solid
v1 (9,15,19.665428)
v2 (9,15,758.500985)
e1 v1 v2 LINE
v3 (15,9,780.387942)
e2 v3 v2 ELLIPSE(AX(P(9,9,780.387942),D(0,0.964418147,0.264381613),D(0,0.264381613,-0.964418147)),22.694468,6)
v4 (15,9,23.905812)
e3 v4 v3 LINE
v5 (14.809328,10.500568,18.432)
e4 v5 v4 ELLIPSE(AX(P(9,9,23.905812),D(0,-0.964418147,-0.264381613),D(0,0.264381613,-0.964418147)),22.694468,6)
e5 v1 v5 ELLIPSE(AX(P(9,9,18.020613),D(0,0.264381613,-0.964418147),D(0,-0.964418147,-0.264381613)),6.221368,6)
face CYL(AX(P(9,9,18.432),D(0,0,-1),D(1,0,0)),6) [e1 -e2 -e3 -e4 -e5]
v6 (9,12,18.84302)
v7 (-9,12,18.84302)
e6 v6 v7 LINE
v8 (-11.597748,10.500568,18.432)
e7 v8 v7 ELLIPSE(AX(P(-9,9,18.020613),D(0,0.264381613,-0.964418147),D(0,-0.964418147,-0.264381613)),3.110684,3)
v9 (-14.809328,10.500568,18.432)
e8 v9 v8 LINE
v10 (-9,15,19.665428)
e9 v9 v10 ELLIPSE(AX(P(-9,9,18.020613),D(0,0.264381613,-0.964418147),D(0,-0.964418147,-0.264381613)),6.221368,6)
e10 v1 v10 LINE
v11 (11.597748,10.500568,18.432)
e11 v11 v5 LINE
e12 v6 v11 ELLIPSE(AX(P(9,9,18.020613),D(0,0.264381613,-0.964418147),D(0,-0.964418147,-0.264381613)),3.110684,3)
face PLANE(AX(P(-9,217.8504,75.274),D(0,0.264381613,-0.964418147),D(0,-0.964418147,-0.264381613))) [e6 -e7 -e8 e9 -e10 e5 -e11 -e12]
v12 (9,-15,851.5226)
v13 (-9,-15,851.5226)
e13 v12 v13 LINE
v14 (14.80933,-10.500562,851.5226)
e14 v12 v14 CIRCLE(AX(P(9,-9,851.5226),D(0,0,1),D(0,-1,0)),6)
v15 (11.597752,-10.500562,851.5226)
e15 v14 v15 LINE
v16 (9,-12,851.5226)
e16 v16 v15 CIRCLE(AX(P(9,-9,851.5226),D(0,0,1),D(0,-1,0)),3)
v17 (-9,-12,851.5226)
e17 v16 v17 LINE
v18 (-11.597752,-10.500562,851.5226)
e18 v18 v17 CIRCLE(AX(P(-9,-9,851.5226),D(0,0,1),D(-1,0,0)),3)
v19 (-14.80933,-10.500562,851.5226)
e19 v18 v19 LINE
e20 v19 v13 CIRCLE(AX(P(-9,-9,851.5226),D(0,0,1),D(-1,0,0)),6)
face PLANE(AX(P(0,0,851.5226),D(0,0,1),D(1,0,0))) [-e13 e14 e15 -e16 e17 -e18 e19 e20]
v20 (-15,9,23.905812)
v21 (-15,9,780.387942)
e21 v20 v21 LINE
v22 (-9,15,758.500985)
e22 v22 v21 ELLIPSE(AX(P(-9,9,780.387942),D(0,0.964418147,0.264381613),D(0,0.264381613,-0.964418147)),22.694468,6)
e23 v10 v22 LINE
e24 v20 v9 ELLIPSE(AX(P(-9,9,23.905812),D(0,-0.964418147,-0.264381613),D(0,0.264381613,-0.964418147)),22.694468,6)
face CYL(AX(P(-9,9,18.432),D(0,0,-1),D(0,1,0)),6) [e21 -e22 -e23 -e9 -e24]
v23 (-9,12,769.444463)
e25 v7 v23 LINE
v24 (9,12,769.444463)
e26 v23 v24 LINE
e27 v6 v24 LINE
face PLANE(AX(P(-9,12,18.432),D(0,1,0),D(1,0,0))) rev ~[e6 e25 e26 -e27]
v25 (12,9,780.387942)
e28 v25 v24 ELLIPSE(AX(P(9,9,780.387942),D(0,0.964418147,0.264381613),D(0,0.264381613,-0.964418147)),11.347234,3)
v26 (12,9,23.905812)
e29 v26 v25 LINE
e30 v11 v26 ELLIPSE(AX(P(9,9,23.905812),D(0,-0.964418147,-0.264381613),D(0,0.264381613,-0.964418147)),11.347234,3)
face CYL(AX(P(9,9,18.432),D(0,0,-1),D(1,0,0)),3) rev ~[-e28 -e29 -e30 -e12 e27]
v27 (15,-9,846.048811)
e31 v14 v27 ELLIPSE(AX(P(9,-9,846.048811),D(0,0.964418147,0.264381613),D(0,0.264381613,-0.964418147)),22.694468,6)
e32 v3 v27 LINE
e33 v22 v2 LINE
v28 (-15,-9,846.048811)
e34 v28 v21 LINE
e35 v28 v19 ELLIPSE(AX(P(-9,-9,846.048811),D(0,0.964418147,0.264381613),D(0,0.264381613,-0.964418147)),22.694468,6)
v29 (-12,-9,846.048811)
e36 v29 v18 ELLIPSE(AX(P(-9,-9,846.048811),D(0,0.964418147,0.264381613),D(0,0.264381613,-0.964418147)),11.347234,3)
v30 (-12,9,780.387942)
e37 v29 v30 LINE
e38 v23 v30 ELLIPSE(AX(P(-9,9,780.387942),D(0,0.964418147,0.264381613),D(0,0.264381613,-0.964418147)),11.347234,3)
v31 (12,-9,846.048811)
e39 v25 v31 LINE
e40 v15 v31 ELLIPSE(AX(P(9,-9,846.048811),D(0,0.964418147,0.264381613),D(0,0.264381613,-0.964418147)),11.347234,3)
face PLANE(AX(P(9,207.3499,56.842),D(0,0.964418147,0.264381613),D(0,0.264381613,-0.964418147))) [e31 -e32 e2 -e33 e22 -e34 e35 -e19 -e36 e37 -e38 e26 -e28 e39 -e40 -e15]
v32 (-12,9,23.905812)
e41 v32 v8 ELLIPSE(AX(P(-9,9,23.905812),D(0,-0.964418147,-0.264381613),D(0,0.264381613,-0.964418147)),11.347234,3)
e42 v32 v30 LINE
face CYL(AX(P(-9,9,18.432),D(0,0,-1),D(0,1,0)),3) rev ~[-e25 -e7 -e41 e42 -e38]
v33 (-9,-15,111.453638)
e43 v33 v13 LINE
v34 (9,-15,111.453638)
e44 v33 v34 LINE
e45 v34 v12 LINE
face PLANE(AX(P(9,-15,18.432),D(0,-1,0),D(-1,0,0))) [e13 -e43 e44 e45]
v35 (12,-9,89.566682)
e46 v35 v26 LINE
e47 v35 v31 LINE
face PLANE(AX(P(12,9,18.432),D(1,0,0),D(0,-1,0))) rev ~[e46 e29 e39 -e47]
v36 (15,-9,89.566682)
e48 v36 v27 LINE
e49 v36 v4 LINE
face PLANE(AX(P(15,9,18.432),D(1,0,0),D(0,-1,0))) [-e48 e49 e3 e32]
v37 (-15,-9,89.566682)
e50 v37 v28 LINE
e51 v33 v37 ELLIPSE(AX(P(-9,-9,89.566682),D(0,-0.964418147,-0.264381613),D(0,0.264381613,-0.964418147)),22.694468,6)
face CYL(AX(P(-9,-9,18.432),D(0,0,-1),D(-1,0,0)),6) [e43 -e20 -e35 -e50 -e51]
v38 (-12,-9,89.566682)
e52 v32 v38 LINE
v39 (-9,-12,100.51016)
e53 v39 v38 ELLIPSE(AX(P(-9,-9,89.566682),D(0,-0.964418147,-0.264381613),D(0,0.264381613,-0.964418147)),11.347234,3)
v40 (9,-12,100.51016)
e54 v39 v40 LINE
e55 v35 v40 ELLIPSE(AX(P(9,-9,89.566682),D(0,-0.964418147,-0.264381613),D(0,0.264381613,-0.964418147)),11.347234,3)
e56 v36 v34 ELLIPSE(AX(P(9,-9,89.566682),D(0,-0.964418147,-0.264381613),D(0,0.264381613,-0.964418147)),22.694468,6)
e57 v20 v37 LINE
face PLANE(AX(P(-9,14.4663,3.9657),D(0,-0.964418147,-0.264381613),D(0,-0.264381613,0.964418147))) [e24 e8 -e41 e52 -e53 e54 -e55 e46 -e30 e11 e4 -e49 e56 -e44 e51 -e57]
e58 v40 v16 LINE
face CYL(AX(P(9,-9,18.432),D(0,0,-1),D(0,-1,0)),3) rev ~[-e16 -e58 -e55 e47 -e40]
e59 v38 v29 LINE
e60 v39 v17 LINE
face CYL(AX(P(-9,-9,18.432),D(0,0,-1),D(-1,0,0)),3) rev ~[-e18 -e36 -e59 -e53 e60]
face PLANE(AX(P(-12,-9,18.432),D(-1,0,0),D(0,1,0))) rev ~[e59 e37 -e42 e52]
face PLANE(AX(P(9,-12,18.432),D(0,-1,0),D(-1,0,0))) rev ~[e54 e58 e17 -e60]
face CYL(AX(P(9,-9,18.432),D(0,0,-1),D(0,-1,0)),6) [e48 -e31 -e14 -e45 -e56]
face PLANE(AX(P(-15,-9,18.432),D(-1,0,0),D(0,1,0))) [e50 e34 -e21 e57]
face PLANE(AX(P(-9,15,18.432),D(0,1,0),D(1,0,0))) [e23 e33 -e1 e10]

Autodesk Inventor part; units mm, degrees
ref_plane "Start Plane" through (0, 0, 18.432) normal (0, 0, 1) x (1, 0, 0)
ref_plane "End Plane" through (0, 0, 851.5226) normal (0, 0, 1) x (1, 0, 0)
sketch "Sketch" plane through (0, 0, 0) normal (0, 0, 1) x (1, 0, 0)
  line L0 (-15, -9) -> (-15, 9)
  line L1 (-9, 15) -> (9, 15)
  line L2 (15, 9) -> (15, -9)
  line L3 (9, -15) -> (-9, -15)
  arc A0 (-15, -9) -> (-9, -15) centre (-9, -9) ccw
  arc A1 (-9, 15) -> (-15, 9) centre (-9, 9) ccw
  arc A2 (15, 9) -> (9, 15) centre (9, 9) ccw
  arc A3 (9, -15) -> (15, -9) centre (9, -9) ccw
  arc A4 (-9, 12) -> (-12, 9) centre (-9, 9) ccw
  line L4 (-9, 12) -> (9, 12)
  arc A5 (12, 9) -> (9, 12) centre (9, 9) ccw
  line L5 (12, 9) -> (12, -9)
  arc A6 (9, -12) -> (12, -9) centre (9, -9) ccw
  line L6 (9, -12) -> (-9, -12)
  arc A7 (-12, -9) -> (-9, -12) centre (-9, -9) ccw
  line L7 (-12, -9) -> (-12, 9)
  line L8 (0, 22.7397) -> (0, -22.7397) construction
  line L9 (-22.7397, 0) -> (22.7397, 0) construction
  dimension "d7" = 6
  dimension "d10" = 30
  dimension "d11" = 30
  dimension "d12" = 3
  dimension "d15" = 15
  dimension "d16" = 15
extrude "Body" add sketch "Sketch" along normal up to surface (833.0906 mm away) from surface at 18.432
sketch "Sketch3" plane through (0, 0, 0) normal (0, 0, 1) x (1, 0, 0)
  line L0 (0, 0) -> (10, 0)
ref_plane "Work Plane3" through (0, 0, 0) normal (0, -1, 0) x (1, 0, 0)
ref_plane "Work Plane4" through (-9, 14.4663, 3.9657) normal (0, -0.9644181, -0.2643816) x (1, 0, 0)
split "Split1" plane through (-9, 14.4663, 3.9657) removes the side toward (0, -0.9644181, -0.2643816)
ref_plane "Work Plane5" through (9, 207.3499, 56.842) normal (0, 0.9644181, 0.2643816) x (1, 0, 0)
split "Split2" plane through (9, 207.3499, 56.842) removes the side toward (0, 0.9644181, 0.2643816)
ref_plane "Work Plane6" through (-9, 217.8504, 75.274) normal (0, 0.2643816, -0.9644181) x (1, 0, 0)
split "Split3" plane through (-9, 217.8504, 75.274) removes the side toward (0, 0.2643816, -0.9644181)
sketch "Sketch4" plane through (0, 0, 0) normal (0, -1, 0) x (1, 0, 0)
  line L0 (-2, 18.432) -> (12, 18.432) projected
  line L1 (-2, 851.5226) -> (12, 851.5226) projected
  dimension "d18" = 833.0906
equation "\"d7\" = G_IR"
equation "\"d10\" = G_H"
equation "\"d11\" = G_W"
equation "\"d12\" = G_T"
equation "\"d15\" = 0.5 * d10"
equation "\"d16\" = 0.5 * d11"
equation "\"d3\" = G_L"
equation "\"G_W\" = 30"
equation "\"G_H\" = 30"
equation "\"G_T\" = 3"
equation "\"G_IR\" = 6"
equation "\"G_L\" = d18"
equation "\"G_OFFSET_START\" = -18.432"
equation "\"G_OFFSET_END\" = -18.432"
equation "\"d13\" = -G_OFFSET_START"
equation "\"d14\" = G_OFFSET_END + B_L"
equation "\"B_L\" = 869.9546"
properties part number "DIN EN 10219-2 - 30 x 30 x 3  - 833.09" material "Steel, Mild"
